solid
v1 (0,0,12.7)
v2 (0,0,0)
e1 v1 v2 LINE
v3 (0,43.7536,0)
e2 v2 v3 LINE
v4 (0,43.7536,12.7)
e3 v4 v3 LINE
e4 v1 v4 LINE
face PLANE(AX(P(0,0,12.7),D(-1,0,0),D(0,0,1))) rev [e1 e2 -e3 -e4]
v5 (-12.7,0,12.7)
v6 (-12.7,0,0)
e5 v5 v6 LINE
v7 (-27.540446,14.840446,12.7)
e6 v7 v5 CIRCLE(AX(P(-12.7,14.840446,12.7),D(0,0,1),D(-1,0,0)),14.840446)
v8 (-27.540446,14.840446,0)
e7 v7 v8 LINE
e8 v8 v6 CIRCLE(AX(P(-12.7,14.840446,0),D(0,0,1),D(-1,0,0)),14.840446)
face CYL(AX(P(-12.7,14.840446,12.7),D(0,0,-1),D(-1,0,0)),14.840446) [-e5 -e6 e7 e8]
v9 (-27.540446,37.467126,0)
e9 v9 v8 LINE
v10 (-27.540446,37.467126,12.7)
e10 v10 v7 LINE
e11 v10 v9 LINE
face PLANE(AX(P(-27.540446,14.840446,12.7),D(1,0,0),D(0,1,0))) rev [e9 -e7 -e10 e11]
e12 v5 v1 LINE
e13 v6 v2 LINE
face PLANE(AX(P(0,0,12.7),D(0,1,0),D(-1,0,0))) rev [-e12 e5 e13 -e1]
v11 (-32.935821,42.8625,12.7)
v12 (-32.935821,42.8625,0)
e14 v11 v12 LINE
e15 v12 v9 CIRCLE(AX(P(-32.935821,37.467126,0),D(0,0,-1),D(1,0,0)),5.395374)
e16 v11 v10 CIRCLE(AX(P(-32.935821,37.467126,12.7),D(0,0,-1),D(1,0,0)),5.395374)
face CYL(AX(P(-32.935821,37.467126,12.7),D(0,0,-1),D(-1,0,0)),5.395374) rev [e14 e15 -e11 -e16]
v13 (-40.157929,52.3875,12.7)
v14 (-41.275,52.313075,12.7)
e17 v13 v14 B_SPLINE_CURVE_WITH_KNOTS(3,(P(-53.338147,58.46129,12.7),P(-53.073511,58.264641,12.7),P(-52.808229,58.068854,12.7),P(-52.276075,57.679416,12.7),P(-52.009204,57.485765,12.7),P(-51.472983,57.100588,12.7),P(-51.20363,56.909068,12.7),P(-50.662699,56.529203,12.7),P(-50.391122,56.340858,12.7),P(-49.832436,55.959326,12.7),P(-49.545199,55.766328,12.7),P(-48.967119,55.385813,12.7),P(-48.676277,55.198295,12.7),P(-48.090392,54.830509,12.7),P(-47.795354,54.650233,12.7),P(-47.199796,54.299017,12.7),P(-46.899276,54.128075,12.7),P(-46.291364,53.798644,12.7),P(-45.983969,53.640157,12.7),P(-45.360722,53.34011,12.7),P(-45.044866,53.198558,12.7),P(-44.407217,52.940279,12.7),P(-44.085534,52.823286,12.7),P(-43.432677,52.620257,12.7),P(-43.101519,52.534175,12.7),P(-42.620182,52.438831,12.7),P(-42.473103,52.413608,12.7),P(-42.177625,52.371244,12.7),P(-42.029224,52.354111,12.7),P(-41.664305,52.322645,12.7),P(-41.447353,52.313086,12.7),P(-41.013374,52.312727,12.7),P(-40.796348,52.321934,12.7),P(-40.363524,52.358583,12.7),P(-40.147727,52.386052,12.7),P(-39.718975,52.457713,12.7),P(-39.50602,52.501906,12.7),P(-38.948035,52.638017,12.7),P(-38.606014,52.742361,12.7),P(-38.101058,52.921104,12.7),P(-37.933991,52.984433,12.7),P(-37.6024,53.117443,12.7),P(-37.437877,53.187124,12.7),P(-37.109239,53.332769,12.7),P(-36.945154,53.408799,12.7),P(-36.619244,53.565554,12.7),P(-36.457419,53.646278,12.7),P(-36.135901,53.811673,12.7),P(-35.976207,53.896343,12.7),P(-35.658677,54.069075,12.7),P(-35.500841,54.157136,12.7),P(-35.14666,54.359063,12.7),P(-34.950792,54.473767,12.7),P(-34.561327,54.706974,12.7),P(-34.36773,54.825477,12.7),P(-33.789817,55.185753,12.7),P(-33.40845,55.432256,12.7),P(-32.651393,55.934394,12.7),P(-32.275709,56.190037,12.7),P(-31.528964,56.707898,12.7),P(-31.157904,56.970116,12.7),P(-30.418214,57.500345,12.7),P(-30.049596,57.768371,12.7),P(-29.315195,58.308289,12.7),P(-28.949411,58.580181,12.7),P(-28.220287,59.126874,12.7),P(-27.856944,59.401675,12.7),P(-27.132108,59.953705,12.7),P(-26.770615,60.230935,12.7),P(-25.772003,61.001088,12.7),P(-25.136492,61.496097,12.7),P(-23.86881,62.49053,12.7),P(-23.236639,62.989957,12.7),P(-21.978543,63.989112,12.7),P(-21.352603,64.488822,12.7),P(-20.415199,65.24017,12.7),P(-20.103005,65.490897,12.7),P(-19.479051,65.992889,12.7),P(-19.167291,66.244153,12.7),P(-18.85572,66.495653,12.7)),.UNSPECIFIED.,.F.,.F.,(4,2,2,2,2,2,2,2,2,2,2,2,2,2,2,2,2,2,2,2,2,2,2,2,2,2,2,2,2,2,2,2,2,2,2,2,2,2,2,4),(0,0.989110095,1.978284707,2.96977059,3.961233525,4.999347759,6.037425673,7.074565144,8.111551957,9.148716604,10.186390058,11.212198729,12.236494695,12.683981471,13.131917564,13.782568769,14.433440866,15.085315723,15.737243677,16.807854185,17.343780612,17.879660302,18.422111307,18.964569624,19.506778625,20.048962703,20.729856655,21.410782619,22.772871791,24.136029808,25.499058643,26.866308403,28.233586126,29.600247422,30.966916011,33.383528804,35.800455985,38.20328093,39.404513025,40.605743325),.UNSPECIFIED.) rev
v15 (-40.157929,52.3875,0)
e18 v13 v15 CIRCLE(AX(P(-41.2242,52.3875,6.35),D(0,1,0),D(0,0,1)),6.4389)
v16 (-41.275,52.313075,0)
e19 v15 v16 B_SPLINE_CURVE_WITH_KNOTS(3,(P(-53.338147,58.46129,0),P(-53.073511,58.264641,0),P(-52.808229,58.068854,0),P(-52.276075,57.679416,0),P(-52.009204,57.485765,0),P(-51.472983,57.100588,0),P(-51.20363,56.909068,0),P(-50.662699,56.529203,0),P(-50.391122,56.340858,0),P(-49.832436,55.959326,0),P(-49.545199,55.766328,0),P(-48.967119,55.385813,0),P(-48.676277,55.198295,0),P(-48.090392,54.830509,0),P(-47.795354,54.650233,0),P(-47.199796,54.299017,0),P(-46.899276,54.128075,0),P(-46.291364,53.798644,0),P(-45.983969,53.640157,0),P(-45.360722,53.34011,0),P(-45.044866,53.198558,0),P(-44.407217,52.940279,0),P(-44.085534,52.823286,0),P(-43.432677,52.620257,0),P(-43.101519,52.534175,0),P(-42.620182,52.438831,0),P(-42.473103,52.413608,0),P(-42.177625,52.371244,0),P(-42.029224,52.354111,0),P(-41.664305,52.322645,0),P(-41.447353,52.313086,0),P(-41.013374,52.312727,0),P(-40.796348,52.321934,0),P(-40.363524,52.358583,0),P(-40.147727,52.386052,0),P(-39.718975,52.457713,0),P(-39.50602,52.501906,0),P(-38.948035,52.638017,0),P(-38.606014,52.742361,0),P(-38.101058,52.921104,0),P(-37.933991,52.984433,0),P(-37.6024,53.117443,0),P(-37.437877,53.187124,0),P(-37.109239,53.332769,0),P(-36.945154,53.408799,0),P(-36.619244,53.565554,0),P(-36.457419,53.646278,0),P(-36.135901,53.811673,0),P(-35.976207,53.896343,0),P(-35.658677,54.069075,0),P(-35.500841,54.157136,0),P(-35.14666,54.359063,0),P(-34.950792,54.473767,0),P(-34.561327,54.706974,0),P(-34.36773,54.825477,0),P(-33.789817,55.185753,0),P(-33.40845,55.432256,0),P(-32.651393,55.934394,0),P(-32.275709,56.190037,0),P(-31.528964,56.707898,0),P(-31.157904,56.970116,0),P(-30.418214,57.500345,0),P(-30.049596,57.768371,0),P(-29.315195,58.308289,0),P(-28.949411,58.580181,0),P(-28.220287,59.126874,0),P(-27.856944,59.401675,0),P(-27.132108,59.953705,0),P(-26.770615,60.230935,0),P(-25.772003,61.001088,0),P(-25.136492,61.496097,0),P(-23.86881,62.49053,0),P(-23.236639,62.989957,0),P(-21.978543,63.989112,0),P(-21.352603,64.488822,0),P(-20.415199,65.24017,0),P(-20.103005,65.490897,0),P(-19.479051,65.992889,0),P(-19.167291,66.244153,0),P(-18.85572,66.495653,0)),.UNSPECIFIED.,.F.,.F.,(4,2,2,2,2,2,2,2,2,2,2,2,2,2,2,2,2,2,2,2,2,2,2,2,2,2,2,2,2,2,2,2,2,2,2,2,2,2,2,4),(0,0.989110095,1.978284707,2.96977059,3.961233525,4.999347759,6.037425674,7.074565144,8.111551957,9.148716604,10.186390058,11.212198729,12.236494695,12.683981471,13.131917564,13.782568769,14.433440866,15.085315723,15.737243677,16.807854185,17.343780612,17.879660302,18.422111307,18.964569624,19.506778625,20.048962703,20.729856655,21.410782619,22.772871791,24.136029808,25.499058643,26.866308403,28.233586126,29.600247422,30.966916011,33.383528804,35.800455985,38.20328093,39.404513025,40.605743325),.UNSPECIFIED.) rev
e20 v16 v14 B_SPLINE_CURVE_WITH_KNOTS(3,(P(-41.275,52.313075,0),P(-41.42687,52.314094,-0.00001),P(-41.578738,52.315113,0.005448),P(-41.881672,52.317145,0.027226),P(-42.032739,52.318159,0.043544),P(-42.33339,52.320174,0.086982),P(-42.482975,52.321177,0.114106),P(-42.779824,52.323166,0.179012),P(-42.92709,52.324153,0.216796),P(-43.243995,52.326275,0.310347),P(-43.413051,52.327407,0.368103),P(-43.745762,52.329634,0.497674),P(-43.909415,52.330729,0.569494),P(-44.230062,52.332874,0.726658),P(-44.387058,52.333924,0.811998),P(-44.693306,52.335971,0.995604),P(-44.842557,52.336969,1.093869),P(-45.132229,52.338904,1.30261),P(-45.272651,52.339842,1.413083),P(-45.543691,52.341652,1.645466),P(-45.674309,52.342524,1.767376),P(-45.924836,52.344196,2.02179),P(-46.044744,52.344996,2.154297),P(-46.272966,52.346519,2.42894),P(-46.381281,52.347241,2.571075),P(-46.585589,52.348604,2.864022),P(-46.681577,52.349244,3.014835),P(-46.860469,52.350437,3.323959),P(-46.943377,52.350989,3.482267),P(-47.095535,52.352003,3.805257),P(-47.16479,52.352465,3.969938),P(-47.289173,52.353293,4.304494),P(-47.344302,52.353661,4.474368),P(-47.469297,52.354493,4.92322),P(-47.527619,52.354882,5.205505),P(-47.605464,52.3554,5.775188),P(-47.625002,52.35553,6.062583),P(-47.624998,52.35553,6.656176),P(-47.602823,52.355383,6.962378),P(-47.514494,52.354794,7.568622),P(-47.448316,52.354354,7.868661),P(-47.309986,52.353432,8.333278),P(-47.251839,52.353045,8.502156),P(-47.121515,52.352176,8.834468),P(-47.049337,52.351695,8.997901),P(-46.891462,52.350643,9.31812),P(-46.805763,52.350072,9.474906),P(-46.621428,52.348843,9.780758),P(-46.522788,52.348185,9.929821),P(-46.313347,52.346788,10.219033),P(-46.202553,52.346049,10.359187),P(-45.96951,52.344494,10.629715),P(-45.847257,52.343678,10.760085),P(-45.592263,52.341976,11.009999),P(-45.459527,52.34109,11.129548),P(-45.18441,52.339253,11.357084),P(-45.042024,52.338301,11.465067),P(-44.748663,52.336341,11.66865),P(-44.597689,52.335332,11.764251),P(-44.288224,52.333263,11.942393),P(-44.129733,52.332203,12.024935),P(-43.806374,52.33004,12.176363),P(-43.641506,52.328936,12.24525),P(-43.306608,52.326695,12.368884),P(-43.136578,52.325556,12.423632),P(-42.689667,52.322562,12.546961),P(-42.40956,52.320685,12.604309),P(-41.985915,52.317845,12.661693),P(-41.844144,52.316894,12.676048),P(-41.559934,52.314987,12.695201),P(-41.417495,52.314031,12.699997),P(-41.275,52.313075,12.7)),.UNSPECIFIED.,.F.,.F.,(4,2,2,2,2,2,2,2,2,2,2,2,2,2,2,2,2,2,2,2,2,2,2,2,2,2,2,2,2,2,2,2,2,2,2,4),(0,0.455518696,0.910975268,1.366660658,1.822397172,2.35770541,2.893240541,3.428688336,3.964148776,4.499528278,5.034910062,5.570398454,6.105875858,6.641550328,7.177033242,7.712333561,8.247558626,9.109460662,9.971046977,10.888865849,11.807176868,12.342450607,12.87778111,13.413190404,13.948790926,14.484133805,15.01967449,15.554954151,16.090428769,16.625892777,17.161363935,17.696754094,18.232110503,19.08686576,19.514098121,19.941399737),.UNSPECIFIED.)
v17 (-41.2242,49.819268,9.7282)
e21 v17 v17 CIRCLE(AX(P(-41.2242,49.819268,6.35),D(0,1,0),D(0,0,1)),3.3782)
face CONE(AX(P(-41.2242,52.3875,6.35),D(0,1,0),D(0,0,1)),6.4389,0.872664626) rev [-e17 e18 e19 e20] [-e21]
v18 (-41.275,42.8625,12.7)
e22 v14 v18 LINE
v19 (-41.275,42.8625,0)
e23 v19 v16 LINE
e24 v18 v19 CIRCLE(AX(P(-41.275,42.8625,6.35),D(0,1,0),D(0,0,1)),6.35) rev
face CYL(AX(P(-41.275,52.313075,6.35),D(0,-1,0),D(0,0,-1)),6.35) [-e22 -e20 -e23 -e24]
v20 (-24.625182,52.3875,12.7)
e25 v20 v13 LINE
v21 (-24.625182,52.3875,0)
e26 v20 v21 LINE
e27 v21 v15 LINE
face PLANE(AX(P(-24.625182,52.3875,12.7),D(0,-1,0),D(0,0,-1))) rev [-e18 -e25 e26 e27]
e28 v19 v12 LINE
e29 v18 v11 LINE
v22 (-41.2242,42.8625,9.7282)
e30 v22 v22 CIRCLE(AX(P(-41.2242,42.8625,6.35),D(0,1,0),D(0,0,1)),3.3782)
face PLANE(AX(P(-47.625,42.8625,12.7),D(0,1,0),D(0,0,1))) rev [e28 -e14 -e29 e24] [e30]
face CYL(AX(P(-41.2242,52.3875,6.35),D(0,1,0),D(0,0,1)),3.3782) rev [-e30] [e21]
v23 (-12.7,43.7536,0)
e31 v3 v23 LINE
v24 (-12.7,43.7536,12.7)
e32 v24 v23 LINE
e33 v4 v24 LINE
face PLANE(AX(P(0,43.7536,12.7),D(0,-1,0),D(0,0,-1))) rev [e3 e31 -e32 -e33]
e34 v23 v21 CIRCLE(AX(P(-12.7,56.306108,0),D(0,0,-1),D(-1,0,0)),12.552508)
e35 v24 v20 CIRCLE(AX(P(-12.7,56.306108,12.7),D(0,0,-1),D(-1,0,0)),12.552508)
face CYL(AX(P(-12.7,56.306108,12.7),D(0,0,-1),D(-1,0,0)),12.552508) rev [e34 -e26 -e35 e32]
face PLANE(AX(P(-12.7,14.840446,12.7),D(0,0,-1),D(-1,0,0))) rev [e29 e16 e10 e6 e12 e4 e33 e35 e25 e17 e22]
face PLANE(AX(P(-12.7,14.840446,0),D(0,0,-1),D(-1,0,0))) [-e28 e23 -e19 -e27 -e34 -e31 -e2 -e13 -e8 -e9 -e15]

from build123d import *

# Parameters (mm, degrees)
BOSS_EXTRUDE1_DEPTH                                 = 12.7
CSK_FOR_1_4_FLAT_HEAD_MACHINE_SCREW_100_D           = 6.7564
CSK_FOR_1_4_FLAT_HEAD_MACHINE_SCREW_100_CSINK_D     = 12.8778
CSK_FOR_1_4_FLAT_HEAD_MACHINE_SCREW_100_CSINK_ANGLE = 100
FILLET1_R                                           = 6.35


with BuildPart() as part:
    # Sketch1 → Boss-Extrude1 (new body)
    with BuildSketch(Plane.XY):
        with BuildLine():
            Line((0, 0), (0, 43.753600343))
            Line((0, 43.753600343), (-12.7, 43.753600343))
            ThreePointArc((-12.7, 43.753600343), (-20.061287028, 46.138664723), (-24.625181908, 52.3875))
            Line((-24.625181908, 52.3875), (-47.625, 52.3875))
            Line((-47.625, 52.3875), (-47.625, 42.8625))
            Line((-47.625, 42.8625), (-32.935820687, 42.8625))
            ThreePointArc((-32.935820687, 42.8625), (-29.120714859, 41.282231424), (-27.540446284, 37.467125597))
            Line((-27.540446284, 37.467125597), (-27.540446284, 14.840446284))
            ThreePointArc((-27.540446284, 14.840446284), (-23.193780203, 4.346666081), (-12.7, 0))
            Line((-12.7, 0), (0, 0))
        make_face()
    extrude(amount=BOSS_EXTRUDE1_DEPTH)

    # CSK for 1/4 Flat Head Machine Screw (100)1 (through all)
    with Locations(Plane(origin=(0, 52.3875, 0), x_dir=(1, 0, 0), z_dir=(0, 1, 0))):
        with Locations((-41.2242, -6.35)):
            CounterSinkHole(CSK_FOR_1_4_FLAT_HEAD_MACHINE_SCREW_100_D / 2, CSK_FOR_1_4_FLAT_HEAD_MACHINE_SCREW_100_CSINK_D / 2, counter_sink_angle=CSK_FOR_1_4_FLAT_HEAD_MACHINE_SCREW_100_CSINK_ANGLE)

    # Fillet1
    fillet1_edges = [part.edges().sort_by_distance(p)[0] for p in [
        (-47.625, 47.625, 0),
        (-47.625, 47.625, 12.7),
    ]]
    fillet(fillet1_edges, radius=FILLET1_R - 0.0001)  # a hair under: the kernel refuses the full size


solid = part.part
